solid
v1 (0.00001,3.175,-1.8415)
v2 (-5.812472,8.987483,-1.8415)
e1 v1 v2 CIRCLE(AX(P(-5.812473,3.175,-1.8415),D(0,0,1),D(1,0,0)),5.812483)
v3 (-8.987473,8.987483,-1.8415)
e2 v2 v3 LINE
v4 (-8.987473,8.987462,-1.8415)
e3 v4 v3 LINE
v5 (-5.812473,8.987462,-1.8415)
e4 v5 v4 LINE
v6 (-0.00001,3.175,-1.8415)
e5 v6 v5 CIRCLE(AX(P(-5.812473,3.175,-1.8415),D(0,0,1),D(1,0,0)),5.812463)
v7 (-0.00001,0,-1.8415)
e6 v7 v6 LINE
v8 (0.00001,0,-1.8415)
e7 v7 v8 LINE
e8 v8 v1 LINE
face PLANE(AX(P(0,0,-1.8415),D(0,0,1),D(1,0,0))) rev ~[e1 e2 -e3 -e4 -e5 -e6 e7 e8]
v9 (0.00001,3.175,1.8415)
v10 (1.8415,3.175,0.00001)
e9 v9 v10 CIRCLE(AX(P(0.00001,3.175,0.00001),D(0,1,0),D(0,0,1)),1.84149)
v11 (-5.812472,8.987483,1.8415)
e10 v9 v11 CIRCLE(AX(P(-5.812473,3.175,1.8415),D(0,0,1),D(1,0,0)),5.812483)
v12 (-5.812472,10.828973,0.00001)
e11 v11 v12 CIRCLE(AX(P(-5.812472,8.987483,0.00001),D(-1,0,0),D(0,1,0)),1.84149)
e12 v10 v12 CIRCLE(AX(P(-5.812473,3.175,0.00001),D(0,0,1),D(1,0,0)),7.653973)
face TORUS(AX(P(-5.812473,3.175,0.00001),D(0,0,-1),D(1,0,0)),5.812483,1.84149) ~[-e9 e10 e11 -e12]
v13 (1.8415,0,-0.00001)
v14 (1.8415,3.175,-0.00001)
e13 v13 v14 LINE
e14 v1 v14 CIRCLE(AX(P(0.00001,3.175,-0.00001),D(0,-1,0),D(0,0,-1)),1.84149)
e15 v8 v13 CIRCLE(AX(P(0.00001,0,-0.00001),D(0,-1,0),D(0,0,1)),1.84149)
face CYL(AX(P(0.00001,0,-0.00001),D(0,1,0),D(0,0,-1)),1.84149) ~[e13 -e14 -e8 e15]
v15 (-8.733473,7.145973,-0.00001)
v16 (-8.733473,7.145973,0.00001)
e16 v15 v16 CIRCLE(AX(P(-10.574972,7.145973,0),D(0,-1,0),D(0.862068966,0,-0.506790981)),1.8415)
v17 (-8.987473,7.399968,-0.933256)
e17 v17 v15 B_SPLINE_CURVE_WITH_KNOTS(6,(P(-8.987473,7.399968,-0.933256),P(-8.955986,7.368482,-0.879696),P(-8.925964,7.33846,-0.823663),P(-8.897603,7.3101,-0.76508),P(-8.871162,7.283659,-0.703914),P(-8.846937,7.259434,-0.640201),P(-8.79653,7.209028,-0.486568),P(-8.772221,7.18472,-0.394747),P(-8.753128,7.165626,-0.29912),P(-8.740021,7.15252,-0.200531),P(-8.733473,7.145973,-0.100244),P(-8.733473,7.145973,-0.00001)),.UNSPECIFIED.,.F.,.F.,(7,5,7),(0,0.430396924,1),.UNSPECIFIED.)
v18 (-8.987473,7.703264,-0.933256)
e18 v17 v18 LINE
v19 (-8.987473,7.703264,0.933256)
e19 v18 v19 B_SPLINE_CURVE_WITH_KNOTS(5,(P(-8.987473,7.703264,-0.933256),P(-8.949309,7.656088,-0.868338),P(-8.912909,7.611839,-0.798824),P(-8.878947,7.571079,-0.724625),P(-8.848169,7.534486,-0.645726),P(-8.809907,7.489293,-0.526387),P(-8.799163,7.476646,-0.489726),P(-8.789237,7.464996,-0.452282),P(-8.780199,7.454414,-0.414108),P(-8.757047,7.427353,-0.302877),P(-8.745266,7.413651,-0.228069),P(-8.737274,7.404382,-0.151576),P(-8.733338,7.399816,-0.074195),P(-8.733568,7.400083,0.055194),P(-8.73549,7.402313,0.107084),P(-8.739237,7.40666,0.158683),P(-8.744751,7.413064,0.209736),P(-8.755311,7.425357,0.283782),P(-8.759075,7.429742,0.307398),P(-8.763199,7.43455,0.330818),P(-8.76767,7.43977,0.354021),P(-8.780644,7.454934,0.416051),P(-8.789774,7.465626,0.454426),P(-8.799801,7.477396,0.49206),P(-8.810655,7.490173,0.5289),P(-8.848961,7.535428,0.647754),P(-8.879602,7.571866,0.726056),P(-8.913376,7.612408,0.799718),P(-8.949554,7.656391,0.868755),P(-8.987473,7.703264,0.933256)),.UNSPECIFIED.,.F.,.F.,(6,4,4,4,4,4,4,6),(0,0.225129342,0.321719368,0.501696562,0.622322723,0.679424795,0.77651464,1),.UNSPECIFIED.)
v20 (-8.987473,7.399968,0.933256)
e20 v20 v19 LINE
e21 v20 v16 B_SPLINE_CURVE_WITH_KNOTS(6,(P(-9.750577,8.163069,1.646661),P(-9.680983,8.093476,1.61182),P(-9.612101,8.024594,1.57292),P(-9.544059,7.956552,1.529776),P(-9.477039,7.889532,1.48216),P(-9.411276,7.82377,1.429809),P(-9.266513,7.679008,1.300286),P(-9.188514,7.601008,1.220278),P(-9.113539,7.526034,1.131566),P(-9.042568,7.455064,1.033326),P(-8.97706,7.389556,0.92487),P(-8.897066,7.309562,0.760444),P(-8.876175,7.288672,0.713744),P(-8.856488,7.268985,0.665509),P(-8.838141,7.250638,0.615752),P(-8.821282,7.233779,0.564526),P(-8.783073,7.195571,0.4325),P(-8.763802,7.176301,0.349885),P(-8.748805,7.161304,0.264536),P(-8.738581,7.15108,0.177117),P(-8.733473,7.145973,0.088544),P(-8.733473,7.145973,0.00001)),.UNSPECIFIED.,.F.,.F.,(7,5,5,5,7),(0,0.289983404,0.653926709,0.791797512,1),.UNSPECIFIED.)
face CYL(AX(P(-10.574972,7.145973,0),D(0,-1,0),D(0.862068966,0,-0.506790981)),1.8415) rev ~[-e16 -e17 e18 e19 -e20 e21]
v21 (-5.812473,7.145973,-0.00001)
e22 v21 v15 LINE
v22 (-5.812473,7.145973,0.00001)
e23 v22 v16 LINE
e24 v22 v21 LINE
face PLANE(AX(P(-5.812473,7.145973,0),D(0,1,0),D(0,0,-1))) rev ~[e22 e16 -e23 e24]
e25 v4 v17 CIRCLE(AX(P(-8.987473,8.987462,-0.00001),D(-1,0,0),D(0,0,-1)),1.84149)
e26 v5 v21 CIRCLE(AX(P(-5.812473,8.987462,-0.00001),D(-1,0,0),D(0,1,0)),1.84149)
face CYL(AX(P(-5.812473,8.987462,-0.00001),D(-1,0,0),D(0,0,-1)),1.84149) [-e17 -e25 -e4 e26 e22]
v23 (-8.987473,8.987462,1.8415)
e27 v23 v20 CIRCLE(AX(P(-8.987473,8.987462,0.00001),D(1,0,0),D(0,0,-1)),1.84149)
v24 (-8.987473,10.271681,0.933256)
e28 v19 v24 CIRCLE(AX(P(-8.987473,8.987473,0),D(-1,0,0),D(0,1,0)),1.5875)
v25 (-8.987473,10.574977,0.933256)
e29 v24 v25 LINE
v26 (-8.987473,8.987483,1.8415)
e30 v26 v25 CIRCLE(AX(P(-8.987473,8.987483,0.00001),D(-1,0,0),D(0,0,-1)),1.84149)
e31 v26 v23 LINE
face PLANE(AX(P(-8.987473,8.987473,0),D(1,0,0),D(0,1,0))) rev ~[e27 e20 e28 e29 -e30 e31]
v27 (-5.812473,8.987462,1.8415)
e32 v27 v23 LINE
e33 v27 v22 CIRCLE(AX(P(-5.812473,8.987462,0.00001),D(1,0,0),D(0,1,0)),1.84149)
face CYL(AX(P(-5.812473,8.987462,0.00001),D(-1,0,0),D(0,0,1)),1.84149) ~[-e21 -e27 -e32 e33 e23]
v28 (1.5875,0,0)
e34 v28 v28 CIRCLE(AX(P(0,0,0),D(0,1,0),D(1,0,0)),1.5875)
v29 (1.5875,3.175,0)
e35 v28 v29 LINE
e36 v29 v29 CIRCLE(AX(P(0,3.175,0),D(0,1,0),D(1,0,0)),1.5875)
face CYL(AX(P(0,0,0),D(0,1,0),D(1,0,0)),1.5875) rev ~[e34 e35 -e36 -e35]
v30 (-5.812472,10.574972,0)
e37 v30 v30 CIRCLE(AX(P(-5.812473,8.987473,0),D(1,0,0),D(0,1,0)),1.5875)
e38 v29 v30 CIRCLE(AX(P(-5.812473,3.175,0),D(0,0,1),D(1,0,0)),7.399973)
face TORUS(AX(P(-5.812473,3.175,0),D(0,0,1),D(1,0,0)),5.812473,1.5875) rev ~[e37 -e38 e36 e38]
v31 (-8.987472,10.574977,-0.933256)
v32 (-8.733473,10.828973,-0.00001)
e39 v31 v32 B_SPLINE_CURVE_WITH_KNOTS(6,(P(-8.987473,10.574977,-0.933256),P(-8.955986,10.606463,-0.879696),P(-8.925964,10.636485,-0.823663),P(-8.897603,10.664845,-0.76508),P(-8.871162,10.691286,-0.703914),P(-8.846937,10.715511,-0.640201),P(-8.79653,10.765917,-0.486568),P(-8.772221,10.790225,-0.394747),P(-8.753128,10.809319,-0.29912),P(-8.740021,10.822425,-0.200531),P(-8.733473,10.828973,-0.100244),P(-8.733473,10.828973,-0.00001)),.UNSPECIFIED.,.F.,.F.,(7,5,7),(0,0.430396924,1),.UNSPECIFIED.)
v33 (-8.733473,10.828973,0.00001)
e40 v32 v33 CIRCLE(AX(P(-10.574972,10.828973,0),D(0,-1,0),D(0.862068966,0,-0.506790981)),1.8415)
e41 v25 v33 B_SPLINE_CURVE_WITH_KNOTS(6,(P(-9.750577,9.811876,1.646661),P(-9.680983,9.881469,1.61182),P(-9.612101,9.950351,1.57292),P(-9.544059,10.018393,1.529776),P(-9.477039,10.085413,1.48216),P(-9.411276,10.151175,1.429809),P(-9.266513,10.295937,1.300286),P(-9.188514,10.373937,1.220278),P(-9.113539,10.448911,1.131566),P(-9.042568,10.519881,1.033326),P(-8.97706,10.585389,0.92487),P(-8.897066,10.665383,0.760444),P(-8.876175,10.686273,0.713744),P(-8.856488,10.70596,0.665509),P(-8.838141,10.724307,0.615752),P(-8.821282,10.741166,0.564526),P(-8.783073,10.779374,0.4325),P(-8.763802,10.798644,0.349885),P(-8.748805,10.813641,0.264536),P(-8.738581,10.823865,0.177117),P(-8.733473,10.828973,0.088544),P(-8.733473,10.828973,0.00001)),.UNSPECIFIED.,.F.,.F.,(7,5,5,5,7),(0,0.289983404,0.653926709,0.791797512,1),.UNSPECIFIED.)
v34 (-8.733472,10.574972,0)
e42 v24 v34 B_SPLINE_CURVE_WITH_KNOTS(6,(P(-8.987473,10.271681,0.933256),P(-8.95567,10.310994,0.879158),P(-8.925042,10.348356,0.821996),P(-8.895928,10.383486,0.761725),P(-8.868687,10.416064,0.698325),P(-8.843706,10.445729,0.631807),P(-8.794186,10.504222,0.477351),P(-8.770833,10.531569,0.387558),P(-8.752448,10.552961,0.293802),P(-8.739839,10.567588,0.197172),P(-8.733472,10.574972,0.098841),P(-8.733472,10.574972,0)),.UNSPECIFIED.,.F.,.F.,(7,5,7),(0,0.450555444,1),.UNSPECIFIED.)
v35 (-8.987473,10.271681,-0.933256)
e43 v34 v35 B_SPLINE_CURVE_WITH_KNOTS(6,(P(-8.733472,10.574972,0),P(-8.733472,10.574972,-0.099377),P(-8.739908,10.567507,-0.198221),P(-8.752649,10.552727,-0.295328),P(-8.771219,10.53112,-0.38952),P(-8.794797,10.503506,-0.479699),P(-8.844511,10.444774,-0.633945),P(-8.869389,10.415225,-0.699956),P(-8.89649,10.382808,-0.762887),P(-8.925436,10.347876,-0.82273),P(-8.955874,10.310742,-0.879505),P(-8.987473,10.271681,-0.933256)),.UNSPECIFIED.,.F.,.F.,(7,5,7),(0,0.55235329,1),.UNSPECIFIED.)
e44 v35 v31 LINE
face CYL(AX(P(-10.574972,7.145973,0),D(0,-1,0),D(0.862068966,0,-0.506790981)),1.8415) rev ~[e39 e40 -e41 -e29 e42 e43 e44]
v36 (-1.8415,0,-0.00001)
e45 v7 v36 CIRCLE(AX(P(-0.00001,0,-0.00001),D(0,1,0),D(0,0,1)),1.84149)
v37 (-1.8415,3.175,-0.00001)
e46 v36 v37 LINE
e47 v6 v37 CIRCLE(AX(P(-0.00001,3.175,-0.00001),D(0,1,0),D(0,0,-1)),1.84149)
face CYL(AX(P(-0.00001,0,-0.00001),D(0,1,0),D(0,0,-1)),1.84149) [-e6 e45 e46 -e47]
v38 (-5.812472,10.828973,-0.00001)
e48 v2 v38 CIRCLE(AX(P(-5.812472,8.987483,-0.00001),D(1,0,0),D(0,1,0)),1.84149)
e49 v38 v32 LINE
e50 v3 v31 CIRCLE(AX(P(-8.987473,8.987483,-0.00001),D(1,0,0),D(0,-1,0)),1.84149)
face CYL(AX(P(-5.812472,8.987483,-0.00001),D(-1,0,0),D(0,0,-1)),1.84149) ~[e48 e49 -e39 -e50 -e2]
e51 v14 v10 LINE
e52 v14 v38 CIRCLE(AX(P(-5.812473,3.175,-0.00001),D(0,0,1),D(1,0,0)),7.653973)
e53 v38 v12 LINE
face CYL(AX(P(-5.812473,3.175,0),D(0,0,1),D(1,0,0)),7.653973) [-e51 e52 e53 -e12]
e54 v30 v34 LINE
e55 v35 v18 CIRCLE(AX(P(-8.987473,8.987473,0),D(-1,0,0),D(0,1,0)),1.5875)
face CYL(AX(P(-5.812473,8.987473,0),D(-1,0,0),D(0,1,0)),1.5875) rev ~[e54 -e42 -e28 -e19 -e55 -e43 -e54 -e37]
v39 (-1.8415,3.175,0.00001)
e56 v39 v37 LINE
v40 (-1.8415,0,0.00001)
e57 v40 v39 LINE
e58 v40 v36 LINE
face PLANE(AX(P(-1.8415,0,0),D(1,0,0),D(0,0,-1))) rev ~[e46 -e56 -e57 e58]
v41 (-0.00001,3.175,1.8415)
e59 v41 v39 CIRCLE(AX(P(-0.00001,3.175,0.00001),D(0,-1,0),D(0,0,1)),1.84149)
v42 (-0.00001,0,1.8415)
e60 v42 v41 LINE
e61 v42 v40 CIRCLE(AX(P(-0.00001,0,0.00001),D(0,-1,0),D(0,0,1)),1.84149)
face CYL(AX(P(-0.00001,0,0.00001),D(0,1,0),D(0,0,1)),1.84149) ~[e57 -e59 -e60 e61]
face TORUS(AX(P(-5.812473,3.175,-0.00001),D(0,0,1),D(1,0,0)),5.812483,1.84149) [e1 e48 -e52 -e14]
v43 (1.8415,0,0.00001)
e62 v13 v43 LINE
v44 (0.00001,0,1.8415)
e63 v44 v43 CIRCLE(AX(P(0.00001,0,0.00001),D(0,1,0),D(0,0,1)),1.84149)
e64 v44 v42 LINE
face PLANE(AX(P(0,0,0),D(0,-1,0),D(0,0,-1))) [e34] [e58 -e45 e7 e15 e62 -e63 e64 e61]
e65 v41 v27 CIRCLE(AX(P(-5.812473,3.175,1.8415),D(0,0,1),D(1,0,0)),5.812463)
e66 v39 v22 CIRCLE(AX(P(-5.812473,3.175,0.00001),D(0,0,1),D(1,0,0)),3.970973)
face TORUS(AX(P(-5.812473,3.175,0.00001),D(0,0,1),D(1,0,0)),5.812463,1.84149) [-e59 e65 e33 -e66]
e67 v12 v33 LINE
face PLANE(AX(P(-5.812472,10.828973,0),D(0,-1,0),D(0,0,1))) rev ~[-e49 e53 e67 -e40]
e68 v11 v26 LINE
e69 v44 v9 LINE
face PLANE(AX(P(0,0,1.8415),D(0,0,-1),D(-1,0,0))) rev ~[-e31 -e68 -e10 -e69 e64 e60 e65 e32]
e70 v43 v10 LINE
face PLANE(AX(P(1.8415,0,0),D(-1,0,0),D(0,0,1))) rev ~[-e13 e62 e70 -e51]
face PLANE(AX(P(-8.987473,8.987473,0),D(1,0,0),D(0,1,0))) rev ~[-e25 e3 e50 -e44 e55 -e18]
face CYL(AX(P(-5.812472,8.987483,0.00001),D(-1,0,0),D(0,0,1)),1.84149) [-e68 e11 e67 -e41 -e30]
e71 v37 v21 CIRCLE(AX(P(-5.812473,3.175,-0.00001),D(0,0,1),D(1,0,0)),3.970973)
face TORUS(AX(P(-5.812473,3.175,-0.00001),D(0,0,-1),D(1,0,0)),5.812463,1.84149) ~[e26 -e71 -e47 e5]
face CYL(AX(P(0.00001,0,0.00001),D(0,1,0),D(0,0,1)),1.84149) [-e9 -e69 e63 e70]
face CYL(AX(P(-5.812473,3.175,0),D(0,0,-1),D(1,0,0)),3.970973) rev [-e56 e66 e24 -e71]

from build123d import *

# Parameters (mm, degrees)
F1_W     = 3.683
F1_H     = 3.683
F1_R     = 1.5875
F4_DEPTH = 3.683
F5_R     = 1.84149


# Not quite as in the source:
# - a fillet or chamfer is up to 0.001 mm smaller than in the source, because OpenCascade refuses the exact size


with BuildPart() as f2:
    # F2: sweep along a path in F0
    with BuildLine(Plane.XY) as f2_path:
        Line((0, 0), (0, 3.175))
        ThreePointArc((0, 3.175), (-1.7024337798, 7.2850387202), (-5.8124725, 8.9874725))
        Line((-5.8124725, 8.9874725), (-8.9874725, 8.9874725))
    # F1 (on Front) → F2 (sweep)
    with BuildSketch(Plane.XZ):
        Rectangle(F1_W, F1_H)
        Circle(F1_R, mode=Mode.SUBTRACT)
    sweep(path=f2_path.line)

    # F3 (on face) → F4 (cut, through all)
    with BuildSketch(Plane.XZ.offset(-7.1459725)):
        with BuildLine():
            Line((-8.9874725, 0), (-8.9874725, -0.933255592))
            ThreePointArc((-8.9874725, -0.933255592), (-8.7334725, 0), (-8.9874725, 0.933255592))
            Line((-8.9874725, 0.933255592), (-8.9874725, 0))
        make_face()
    extrude(amount=-F4_DEPTH, mode=Mode.SUBTRACT)

    # F5 (radius 1.8415 in the source; OpenCascade refuses exactly that, so slightly less here)
    f5_edges = [f2.edges().sort_by_distance(p)[0] for p in [
        (-3.004571, 5.982902, 1.8415),
        (-3.004571, 5.982902, -1.8415),
        (-0.400297, 8.587176, 1.8415),
        (-0.400297, 8.587176, -1.8415),
    ]]
    fillet(f5_edges, radius=F5_R)


solid = f2.part
